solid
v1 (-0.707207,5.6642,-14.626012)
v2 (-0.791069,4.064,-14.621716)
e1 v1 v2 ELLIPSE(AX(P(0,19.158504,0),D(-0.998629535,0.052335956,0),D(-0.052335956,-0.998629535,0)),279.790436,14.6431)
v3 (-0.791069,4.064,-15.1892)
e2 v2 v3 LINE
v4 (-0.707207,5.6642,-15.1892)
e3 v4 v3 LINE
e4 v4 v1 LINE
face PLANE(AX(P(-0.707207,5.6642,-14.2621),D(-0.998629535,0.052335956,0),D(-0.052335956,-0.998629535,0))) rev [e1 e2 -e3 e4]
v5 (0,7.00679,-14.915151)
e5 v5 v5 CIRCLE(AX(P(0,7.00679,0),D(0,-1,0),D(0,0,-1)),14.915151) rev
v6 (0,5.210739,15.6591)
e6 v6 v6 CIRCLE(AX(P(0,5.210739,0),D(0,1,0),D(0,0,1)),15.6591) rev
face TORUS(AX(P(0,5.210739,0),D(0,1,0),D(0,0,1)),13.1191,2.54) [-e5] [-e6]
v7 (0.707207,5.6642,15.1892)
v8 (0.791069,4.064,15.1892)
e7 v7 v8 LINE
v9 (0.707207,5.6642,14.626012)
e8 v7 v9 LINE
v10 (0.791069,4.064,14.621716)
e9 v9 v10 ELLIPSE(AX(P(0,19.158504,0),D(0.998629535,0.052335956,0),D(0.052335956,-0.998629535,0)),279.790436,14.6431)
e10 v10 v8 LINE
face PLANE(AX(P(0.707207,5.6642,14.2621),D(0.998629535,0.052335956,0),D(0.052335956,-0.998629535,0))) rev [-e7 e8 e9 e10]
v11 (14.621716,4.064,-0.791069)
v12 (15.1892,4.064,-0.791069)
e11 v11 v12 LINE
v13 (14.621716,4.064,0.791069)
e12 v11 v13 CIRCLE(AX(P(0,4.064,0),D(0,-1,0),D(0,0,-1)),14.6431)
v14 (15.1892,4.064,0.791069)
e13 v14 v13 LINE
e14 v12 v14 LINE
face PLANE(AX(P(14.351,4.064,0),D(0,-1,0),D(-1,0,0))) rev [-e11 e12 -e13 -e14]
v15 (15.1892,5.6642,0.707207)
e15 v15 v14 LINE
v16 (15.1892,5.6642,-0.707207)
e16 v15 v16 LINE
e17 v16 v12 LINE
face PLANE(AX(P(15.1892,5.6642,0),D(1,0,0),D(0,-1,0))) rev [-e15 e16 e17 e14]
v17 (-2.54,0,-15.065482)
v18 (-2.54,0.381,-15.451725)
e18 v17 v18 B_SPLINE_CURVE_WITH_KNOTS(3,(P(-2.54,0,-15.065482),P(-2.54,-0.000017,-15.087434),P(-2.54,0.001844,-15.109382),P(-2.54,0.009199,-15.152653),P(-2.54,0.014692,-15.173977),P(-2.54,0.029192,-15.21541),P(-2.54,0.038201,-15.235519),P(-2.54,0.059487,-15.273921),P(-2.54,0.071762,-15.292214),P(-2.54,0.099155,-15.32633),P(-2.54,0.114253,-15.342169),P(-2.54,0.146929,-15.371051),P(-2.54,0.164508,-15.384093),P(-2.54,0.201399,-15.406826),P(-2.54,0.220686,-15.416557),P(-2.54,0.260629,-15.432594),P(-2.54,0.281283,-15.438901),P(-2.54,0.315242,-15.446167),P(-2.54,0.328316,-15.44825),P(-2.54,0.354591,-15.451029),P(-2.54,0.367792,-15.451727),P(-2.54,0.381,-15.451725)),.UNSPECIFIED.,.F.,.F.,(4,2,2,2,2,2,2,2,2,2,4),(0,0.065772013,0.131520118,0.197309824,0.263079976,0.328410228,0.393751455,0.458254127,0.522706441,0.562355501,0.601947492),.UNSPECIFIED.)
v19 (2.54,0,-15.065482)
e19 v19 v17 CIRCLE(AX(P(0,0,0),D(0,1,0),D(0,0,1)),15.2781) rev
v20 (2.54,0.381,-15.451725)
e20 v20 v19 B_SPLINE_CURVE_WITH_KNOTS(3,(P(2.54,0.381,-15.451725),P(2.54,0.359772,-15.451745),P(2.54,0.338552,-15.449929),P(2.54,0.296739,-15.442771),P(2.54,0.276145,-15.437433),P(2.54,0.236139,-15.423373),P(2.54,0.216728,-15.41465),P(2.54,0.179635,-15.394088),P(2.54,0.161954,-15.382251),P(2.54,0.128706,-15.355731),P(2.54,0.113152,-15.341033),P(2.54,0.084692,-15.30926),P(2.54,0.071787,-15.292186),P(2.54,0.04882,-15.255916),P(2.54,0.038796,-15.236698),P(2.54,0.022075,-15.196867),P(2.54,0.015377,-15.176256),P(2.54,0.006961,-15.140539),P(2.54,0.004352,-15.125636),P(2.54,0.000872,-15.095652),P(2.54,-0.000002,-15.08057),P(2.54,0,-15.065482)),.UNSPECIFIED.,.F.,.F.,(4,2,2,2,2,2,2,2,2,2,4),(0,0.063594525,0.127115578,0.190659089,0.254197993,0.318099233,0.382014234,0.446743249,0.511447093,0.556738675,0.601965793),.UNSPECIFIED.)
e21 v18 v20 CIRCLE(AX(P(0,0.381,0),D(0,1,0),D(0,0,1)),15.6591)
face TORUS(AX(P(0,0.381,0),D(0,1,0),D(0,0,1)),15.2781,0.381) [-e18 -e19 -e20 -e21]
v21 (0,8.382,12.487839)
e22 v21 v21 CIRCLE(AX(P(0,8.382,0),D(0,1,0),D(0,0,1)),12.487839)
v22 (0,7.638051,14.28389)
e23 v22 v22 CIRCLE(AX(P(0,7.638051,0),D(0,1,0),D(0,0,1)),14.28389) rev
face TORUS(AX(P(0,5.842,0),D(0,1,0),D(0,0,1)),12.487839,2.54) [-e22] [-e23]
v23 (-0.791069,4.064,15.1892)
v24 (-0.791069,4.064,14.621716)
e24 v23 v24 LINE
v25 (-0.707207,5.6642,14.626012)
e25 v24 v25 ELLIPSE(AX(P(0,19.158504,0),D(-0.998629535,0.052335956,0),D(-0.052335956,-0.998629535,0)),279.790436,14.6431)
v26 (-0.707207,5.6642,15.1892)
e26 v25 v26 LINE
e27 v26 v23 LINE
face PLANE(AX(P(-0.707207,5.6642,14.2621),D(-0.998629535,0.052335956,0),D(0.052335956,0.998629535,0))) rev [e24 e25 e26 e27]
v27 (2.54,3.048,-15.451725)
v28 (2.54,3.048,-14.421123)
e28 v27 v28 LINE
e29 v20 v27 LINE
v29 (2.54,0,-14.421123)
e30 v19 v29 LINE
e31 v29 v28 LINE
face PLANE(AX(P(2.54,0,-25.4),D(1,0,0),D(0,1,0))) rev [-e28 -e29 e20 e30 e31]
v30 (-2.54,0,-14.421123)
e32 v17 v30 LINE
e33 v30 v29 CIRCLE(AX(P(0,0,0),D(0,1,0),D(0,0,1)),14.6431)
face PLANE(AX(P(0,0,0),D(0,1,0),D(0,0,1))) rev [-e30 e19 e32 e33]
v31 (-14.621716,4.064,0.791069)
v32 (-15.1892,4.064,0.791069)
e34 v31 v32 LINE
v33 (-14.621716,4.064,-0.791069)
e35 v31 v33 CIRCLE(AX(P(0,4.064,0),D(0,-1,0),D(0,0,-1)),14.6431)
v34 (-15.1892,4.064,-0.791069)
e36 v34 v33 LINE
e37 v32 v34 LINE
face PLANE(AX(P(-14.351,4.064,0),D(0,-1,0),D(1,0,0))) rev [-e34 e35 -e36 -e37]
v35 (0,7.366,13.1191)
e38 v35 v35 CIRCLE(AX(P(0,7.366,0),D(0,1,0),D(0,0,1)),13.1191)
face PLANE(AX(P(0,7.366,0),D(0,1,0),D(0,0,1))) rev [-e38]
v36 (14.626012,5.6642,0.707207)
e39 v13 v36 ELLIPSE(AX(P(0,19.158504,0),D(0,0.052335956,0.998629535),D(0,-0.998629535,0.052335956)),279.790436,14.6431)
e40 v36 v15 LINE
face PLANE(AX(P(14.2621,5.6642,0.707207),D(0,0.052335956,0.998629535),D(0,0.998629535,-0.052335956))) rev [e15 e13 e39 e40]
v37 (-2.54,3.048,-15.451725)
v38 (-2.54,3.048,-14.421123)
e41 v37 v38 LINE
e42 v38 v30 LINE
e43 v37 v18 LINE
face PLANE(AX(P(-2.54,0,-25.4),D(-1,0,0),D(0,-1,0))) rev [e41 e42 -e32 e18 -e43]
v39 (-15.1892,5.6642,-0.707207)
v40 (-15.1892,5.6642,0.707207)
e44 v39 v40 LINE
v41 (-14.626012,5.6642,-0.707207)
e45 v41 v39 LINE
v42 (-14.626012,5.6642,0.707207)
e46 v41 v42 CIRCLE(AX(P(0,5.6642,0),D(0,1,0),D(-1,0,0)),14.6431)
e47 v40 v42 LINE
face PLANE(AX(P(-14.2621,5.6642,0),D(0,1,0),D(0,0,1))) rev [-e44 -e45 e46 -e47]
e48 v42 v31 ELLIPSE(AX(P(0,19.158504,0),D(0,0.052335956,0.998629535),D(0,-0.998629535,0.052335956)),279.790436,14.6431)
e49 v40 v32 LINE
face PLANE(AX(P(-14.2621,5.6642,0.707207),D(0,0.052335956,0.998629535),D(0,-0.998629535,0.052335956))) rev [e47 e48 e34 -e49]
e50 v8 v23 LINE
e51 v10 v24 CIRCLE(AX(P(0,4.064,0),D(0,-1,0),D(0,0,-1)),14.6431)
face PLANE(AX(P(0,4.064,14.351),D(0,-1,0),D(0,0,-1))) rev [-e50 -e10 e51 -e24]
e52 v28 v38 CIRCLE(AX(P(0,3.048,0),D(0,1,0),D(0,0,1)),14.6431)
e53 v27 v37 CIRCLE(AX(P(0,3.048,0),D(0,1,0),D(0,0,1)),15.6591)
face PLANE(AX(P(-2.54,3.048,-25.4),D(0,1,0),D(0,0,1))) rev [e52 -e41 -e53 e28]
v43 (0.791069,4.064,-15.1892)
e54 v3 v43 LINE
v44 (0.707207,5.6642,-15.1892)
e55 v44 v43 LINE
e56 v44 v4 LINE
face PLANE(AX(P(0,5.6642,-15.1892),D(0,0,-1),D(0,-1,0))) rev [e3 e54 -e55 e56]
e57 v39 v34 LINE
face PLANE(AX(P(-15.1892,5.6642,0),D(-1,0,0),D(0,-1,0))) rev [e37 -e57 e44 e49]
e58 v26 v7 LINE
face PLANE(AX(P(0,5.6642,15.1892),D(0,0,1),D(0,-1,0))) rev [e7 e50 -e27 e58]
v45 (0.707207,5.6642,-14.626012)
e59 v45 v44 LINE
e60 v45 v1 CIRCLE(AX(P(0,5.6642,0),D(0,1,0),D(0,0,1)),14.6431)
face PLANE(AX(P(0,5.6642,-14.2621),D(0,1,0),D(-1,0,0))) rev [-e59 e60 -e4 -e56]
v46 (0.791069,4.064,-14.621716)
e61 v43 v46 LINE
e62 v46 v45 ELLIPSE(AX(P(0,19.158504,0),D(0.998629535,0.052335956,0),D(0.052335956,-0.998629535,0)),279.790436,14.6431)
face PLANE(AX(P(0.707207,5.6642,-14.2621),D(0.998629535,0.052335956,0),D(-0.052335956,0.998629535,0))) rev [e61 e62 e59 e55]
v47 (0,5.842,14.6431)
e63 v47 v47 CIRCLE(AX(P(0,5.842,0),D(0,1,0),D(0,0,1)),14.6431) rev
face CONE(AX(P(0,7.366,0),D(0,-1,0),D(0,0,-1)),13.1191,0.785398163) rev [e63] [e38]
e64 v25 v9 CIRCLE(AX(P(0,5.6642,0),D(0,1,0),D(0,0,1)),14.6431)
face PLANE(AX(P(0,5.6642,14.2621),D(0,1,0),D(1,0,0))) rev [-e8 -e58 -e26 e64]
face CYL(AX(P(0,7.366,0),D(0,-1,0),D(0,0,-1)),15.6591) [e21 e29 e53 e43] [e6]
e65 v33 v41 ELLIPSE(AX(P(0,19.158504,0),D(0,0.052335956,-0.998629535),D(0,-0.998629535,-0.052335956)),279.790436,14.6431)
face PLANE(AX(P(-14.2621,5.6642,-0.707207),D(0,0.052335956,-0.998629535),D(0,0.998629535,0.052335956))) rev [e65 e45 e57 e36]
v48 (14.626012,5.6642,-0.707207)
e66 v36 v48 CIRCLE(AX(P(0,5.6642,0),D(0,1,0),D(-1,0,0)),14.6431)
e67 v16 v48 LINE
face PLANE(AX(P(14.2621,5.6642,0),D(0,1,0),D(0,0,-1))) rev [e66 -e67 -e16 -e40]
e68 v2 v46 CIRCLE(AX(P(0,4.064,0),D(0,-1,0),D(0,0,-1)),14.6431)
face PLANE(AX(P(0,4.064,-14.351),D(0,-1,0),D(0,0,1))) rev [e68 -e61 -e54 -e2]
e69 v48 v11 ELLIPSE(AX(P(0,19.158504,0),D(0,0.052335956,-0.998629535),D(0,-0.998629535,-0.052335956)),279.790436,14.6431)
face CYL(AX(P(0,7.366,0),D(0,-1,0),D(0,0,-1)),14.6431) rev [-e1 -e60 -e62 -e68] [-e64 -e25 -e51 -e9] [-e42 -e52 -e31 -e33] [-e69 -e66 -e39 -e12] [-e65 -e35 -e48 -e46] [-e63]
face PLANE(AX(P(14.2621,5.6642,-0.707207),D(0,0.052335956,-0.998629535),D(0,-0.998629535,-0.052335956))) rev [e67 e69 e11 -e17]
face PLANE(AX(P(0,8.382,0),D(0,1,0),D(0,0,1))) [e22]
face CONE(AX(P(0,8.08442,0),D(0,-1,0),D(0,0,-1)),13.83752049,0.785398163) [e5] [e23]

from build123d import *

# Parameters (mm, degrees)
SKETCH1_R           = 14.6431
BOSS_EXTRUDE1_DEPTH = 7.366
FILLET1_SIZE        = 1.524
SHELL1_T            = 1.016
SKETCH2_W           = 5.08
SKETCH2_H           = 3.048
CUT_EXTRUDE1_DEPTH  = 25.4
FILLET2_R           = 0.381
SNAP_START          = 14.621716272
SNAP_GROOVE1_DEPTH  = 0.567483728
CIRPATTERN2_COUNT   = 4
FILLET3_R           = 2.54
FILLET4_R           = 2.54


# Read off the part's stored shape, not the designer's step: Snap Groove1
with BuildPart() as part:
    # Sketch1 → Boss-Extrude1 (new body)
    with BuildSketch(Plane(origin=(0, 0, 0), x_dir=(1, 0, 0), z_dir=(0, 1, 0))):
        with Locations(Location((0, 0, 0), (0, 0, 270))):
            Circle(SKETCH1_R)
    extrude(amount=BOSS_EXTRUDE1_DEPTH)

    # Fillet1
    fillet1_edges = [part.edges().sort_by_distance(p)[0] for p in [
        (0, 7.366, -14.6431),
    ]]
    chamfer(fillet1_edges, length=FILLET1_SIZE)

    # Shell1
    shell1_openings = [part.faces().sort_by_distance(p)[0] for p in [
        (0, 0, 0),
    ]]
    offset(amount=SHELL1_T, openings=shell1_openings, kind=Kind.INTERSECTION)

    # Sketch2 → Cut-Extrude1 (cut)
    with BuildSketch(Plane.XY):
        with Locations((0, 1.524)):
            Rectangle(SKETCH2_W, SKETCH2_H)
    extrude(amount=-CUT_EXTRUDE1_DEPTH, mode=Mode.SUBTRACT)

    # Fillet2
    fillet2_edges = [part.edges().sort_by_distance(p)[0] for p in [
        (15.607170203, 0, 1.274225676),
    ]]
    fillet(fillet2_edges, radius=FILLET2_R)

    # Snap Groove1 outline → Snap Groove1 (cut)
    with BuildSketch(Plane.XY.offset(SNAP_START)):
        Polygon((-0.707206527, 5.6642), (-0.791069456, 4.064), (0.791069456, 4.064), (0.707206527, 5.6642), align=None)
    snap_groove1 = extrude(amount=SNAP_GROOVE1_DEPTH, mode=Mode.SUBTRACT)

    # CirPattern2: Snap Groove1 ×4 about axis
    cirpattern2_axis = Axis((0, 0, 0), (0, 1, 0))
    for i in range(1, CIRPATTERN2_COUNT):
        add(snap_groove1.rotate(cirpattern2_axis, i * 360 / CIRPATTERN2_COUNT), mode=Mode.SUBTRACT)

    # Fillet3
    fillet3_edges = [part.edges().sort_by_distance(p)[0] for p in [
        (0, 8.382, -13.539940979),
    ]]
    fillet(fillet3_edges, radius=FILLET3_R)

    # Fillet4
    fillet4_edges = [part.edges().sort_by_distance(p)[0] for p in [
        (0, 6.262840979, -15.6591),
    ]]
    fillet(fillet4_edges, radius=FILLET4_R)


solid = part.part
